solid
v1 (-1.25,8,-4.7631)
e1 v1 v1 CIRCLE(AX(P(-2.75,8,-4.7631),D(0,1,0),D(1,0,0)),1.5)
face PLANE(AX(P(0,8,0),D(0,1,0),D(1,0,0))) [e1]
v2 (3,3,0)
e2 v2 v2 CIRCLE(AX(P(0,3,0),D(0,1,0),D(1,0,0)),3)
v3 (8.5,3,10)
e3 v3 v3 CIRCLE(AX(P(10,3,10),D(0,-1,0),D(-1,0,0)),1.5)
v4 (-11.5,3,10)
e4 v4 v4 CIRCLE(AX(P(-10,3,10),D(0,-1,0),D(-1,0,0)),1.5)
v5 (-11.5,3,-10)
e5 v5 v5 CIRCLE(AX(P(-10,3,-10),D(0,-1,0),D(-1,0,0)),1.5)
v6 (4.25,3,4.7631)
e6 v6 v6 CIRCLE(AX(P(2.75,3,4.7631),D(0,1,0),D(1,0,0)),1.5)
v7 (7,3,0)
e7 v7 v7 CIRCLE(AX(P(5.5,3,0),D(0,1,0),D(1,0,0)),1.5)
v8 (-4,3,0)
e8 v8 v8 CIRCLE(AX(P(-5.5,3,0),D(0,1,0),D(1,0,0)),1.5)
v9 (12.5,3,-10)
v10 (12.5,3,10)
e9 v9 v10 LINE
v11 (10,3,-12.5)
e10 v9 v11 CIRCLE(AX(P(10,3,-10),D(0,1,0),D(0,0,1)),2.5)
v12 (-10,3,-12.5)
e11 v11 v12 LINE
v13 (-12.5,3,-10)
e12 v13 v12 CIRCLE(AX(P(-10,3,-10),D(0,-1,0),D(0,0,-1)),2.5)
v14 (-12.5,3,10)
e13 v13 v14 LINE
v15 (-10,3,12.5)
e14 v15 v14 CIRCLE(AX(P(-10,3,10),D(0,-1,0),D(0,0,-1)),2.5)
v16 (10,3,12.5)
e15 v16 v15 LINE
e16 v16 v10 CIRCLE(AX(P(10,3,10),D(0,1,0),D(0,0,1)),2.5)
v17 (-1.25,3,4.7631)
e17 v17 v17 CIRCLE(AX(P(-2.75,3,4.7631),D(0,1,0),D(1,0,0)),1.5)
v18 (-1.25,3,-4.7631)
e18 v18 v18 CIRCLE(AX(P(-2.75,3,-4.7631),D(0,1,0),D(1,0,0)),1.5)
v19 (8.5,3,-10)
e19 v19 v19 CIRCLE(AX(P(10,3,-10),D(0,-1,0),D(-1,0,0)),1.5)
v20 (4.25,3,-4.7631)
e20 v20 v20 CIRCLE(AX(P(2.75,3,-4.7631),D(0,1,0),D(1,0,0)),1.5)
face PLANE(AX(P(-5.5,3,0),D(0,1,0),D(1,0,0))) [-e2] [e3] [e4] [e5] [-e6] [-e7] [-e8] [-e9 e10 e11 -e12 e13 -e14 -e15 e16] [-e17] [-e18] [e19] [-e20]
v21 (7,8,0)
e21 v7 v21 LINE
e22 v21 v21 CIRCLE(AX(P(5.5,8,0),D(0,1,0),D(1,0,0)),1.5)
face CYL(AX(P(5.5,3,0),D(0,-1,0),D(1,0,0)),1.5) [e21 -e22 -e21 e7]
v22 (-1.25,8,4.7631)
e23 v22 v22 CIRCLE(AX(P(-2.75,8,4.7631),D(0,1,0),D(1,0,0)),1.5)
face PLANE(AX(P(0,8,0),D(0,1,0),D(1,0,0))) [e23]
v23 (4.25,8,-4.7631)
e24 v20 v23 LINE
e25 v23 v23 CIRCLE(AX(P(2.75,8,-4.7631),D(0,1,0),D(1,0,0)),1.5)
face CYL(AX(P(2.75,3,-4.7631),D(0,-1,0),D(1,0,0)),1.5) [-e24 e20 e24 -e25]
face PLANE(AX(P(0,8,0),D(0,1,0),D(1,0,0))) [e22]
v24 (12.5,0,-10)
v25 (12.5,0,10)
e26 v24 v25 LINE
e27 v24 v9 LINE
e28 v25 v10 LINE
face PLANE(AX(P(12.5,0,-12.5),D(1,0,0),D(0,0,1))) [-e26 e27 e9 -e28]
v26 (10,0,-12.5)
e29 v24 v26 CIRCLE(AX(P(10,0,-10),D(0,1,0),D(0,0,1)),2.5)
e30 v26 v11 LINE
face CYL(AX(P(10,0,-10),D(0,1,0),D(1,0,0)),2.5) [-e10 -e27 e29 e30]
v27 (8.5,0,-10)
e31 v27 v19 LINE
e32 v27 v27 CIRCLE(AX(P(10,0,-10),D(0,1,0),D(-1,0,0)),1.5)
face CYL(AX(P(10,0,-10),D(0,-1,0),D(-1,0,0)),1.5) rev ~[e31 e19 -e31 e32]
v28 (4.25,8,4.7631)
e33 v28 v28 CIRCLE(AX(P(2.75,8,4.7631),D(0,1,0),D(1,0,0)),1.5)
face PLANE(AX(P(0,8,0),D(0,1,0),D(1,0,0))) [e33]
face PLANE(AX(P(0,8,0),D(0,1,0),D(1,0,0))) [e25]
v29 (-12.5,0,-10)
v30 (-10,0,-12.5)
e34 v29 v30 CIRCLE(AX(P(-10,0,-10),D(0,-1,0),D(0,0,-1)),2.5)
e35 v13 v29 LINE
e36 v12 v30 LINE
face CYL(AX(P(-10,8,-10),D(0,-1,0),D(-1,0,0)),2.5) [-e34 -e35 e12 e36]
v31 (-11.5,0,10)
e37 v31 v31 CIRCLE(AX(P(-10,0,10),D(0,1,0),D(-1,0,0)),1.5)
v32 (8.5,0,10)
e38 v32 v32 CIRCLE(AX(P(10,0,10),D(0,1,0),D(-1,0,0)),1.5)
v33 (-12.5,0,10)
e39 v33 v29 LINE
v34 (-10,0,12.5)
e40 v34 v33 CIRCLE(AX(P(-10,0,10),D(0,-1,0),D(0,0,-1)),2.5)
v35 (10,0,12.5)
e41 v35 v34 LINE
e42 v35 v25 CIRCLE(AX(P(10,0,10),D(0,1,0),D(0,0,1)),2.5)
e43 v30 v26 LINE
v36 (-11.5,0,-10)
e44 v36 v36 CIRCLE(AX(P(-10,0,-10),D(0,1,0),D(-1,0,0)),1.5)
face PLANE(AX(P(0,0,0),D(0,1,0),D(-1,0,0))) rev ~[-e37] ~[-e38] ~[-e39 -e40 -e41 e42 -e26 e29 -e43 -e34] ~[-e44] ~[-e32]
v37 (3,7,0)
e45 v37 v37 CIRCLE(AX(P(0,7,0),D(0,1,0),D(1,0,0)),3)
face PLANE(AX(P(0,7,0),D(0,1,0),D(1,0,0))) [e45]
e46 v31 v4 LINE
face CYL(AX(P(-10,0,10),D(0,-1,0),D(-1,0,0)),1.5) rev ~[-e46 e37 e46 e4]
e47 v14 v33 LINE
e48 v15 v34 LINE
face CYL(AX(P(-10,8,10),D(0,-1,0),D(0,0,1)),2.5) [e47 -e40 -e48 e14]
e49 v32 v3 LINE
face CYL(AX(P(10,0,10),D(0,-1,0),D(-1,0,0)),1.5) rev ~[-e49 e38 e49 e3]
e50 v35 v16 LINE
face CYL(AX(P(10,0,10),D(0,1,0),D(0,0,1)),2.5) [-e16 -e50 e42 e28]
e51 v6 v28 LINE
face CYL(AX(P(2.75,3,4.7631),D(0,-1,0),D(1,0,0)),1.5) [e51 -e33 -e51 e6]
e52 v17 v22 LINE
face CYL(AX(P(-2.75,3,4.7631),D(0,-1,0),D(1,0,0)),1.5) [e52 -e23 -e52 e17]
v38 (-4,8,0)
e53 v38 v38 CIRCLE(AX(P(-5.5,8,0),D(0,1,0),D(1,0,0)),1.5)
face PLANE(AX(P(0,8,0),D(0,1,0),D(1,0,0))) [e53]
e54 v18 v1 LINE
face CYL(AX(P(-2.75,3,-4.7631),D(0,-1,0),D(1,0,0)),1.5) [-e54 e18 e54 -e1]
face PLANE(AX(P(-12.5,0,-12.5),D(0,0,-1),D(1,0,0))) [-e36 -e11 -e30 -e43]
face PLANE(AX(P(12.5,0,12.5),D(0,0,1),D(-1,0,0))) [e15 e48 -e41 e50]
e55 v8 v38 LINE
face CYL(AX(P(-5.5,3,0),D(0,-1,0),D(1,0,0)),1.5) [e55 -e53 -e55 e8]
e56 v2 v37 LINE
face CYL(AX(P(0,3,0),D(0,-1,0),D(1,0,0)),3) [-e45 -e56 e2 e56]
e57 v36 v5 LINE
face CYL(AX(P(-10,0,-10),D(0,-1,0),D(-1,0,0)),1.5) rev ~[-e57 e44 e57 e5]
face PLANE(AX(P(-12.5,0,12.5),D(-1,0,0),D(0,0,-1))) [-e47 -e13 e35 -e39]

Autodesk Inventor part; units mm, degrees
ref_plane "YZ Plane" through (0, 0, 0) normal (1, 0, 0) x (0, 1, 0)
ref_plane "XZ Plane" through (0, 0, 0) normal (0, 1, 0) x (-1, 0, 0)
ref_plane "XY Plane" through (0, 0, 0) normal (0, 0, 1) x (1, 0, 0)
sketch "Sketch1" plane through (0, 0, 0) normal (0, 1, 0) x (-1, 0, 0)
  line L0 (-12.5, 12.5) -> (12.5, 12.5)
  line L1 (12.5, 12.5) -> (12.5, -12.5)
  line L2 (12.5, -12.5) -> (-12.5, -12.5)
  line L3 (-12.5, -12.5) -> (-12.5, 12.5)
  line L4 (-12.5, 12.5) -> (12.5, -12.5) construction
  line L5 (12.5, 12.5) -> (-12.5, -12.5) construction
  line L6 (-10, 10) -> (10, 10) construction
  line L7 (10, 10) -> (10, -10) construction
  line L8 (10, -10) -> (-10, -10) construction
  line L9 (-10, -10) -> (-10, 10) construction
  line L10 (-10, 10) -> (10, -10) construction
  line L11 (10, 10) -> (-10, -10) construction
  circle A0 centre (10, 10) radius 1.5
  circle A1 centre (10, -10) radius 1.5
  circle A2 centre (-10, -10) radius 1.5
  circle A3 centre (-10, 10) radius 1.5
  point P0 (0, 0)
  dimension "d0" = 25
  dimension "d1" = 25
  dimension "d2" = 3
  dimension "d3" = 3
  dimension "d4" = 3
  dimension "d5" = 3
  dimension "d6" = 20
extrude "Extrusion1" add sketch "Sketch1" along normal blind 3
sketch "Sketch2" plane through (0, 3, 0) normal (0, 1, 0) x (1, 0, 0)
  circle A0 centre (0, 0) radius 3
  circle A1 centre (-5.5, 0) radius 1.5
  circle A2 centre (-2.75, -4.7631) radius 1.5
  circle A3 centre (2.75, -4.7631) radius 1.5
  circle A4 centre (5.5, 0) radius 1.5
  circle A5 centre (2.75, 4.7631) radius 1.5
  circle A6 centre (-2.75, 4.7631) radius 1.5
  dimension "d9" = 6
  dimension "d10" = 3
  dimension "d11" = 5.5
  dimension "d14" = 360
extrude "Extrusion2" add sketch "Sketch2" along normal blind 5 contours A1 | A2 | A3 | A4 | A5 | A6
sketch "Sketch3" plane through (0, 3, 0) normal (0, 1, 0) x (1, 0, 0)
  circle A0 centre (0, 0) radius 3
  dimension "d18" = 6
extrude "Extrusion3" add sketch "Sketch3" along normal blind 4
sketch "Sketch5" plane through (-5.5, 8, 0) normal (0, 1, 0) x (1, 0, 0)
  circle A0 centre (0, 0) radius 2.5
  circle A1 centre (2.75, -4.7631) radius 2.5
  circle A2 centre (8.25, -4.7631) radius 2.5
  circle A3 centre (11, 0) radius 2.5
  circle A4 centre (8.25, 4.7631) radius 2.5
  circle A5 centre (2.75, 4.7631) radius 2.5
  circle A6 centre (5.5, 0) radius 3.5
  circle A7 centre (0, 0) radius 1.4875
  circle A8 centre (2.75, -4.7631) radius 1.4875
  circle A9 centre (8.25, -4.7631) radius 1.4875
  circle A10 centre (11, 0) radius 1.4875
  circle A11 centre (8.25, 4.7631) radius 1.4875
  circle A12 centre (2.75, 4.7631) radius 1.4875
  line L0 (18, 12.5) -> (-7, 12.5) projected
  line L1 (18, -12.5) -> (-7, -12.5)
  line L2 (-7, -12.5) -> (-7, 12.5)
  line L3 (-7, 12.5) -> (18, 12.5)
  line L4 (18, 12.5) -> (18, -12.5)
  line L5 (18, -12.5) -> (-7, 12.5) construction
  line L6 (-7, -12.5) -> (18, 12.5) construction
  circle A13 centre (-4.5, -10) radius 1.5 projected
  circle A14 centre (-4.5, -10) radius 1.65
  circle A15 centre (-4.5, 10) radius 1.5 projected
  circle A16 centre (-4.5, 10) radius 1.65
  circle A17 centre (15.5, 10) radius 1.5 projected
  circle A18 centre (15.5, 10) radius 1.65
  circle A19 centre (15.5, -10) radius 1.5 projected
  circle A20 centre (15.5, -10) radius 1.65
  point P0 (8.7955, -1.179)
  point P1 (8.1687, -2.2645)
  point P2 (6.1267, -3.4434)
  point P3 (4.8733, -3.4434)
  point P4 (2.8313, -2.2645)
  point P5 (2.2045, -1.179)
  point P6 (2.2045, 1.179)
  point P7 (2.8313, 2.2645)
  point P8 (4.8733, 3.4434)
  point P9 (6.1267, 3.4434)
  point P10 (8.1687, 2.2645)
  point P11 (8.7955, 1.179)
  dimension "d21" = 5
  dimension "d24" = 360
  dimension "d26" = 7
  dimension "d29" = 360
extrude "Extrusion4" add sketch "Sketch5" against normal blind 5 contours L4 L1 L2 L0 | A14 | A16 | A18 | A20
fillet "Fillet1" radius 0.5 12 edges at (-2.6687, 5.5, 2.2645) (-0.6267, 5.5, 3.4434) (2.6687, 5.5, 2.2645) (0.6267, 5.5, 3.4434) (-3.2955, 5.5, -1.179) (-3.2955, 5.5, 1.179) (-0.6267, 5.5, -3.4434) (-2.6687, 5.5, -2.2645) (2.6687, 5.5, -2.2645) (0.6267, 5.5, -3.4434) (3.2955, 5.5, 1.179) (3.2955, 5.5, -1.179)
fillet "Fillet2" radius 2.5 4 edges at (12.5, 4, -12.5) (-12.5, 4, -12.5) (12.5, 4, 12.5) (-12.5, 4, 12.5)
sketch "Sketch7" plane through (0, 7, 0) normal (0, 1, 0) x (1, 0, 0)
  circle A0 centre (0, 0) radius 1
extrude "Extrusion5" [suppressed]
sketch "Sketch8" plane through (-5.5, 8, 0) normal (0, 1, 0) x (1, 0, 0)
  circle A0 centre (0, 0) radius 1
  point P0 (5.5, 0)
  dimension "d37" = 2
extrude "Extrusion6" [suppressed]
pattern_circular "Circular Pattern1" [suppressed]
sketch "Sketch9" plane through (-5.5, 8, 0) normal (0, 1, 0) x (1, 0, 0)
  line L0 (-7.0276, -1) -> (-2, -1)
  line L1 (-2, -1) -> (-2, 1)
  line L2 (-2, 1) -> (-7.0276, 1)
  line L3 (-7.0276, 1) -> (-7.0276, -1)
  line L4 (-7.0276, -1) -> (-2, 1) construction
  line L5 (-2, -1) -> (-7.0276, 1) construction
  point P0 (5.5, 0)
  point P1 (-4.5138, 0)
extrude "Extrusion7" cut sketch "Sketch9" against normal blind 5
thicken "Thicken1" operation add thickness 5 both sides no extend neighbours yes toward (0, -1, 0) faces at (0.7594, 8, 10.7394)
properties part number "PDMS stretcher mould A"
